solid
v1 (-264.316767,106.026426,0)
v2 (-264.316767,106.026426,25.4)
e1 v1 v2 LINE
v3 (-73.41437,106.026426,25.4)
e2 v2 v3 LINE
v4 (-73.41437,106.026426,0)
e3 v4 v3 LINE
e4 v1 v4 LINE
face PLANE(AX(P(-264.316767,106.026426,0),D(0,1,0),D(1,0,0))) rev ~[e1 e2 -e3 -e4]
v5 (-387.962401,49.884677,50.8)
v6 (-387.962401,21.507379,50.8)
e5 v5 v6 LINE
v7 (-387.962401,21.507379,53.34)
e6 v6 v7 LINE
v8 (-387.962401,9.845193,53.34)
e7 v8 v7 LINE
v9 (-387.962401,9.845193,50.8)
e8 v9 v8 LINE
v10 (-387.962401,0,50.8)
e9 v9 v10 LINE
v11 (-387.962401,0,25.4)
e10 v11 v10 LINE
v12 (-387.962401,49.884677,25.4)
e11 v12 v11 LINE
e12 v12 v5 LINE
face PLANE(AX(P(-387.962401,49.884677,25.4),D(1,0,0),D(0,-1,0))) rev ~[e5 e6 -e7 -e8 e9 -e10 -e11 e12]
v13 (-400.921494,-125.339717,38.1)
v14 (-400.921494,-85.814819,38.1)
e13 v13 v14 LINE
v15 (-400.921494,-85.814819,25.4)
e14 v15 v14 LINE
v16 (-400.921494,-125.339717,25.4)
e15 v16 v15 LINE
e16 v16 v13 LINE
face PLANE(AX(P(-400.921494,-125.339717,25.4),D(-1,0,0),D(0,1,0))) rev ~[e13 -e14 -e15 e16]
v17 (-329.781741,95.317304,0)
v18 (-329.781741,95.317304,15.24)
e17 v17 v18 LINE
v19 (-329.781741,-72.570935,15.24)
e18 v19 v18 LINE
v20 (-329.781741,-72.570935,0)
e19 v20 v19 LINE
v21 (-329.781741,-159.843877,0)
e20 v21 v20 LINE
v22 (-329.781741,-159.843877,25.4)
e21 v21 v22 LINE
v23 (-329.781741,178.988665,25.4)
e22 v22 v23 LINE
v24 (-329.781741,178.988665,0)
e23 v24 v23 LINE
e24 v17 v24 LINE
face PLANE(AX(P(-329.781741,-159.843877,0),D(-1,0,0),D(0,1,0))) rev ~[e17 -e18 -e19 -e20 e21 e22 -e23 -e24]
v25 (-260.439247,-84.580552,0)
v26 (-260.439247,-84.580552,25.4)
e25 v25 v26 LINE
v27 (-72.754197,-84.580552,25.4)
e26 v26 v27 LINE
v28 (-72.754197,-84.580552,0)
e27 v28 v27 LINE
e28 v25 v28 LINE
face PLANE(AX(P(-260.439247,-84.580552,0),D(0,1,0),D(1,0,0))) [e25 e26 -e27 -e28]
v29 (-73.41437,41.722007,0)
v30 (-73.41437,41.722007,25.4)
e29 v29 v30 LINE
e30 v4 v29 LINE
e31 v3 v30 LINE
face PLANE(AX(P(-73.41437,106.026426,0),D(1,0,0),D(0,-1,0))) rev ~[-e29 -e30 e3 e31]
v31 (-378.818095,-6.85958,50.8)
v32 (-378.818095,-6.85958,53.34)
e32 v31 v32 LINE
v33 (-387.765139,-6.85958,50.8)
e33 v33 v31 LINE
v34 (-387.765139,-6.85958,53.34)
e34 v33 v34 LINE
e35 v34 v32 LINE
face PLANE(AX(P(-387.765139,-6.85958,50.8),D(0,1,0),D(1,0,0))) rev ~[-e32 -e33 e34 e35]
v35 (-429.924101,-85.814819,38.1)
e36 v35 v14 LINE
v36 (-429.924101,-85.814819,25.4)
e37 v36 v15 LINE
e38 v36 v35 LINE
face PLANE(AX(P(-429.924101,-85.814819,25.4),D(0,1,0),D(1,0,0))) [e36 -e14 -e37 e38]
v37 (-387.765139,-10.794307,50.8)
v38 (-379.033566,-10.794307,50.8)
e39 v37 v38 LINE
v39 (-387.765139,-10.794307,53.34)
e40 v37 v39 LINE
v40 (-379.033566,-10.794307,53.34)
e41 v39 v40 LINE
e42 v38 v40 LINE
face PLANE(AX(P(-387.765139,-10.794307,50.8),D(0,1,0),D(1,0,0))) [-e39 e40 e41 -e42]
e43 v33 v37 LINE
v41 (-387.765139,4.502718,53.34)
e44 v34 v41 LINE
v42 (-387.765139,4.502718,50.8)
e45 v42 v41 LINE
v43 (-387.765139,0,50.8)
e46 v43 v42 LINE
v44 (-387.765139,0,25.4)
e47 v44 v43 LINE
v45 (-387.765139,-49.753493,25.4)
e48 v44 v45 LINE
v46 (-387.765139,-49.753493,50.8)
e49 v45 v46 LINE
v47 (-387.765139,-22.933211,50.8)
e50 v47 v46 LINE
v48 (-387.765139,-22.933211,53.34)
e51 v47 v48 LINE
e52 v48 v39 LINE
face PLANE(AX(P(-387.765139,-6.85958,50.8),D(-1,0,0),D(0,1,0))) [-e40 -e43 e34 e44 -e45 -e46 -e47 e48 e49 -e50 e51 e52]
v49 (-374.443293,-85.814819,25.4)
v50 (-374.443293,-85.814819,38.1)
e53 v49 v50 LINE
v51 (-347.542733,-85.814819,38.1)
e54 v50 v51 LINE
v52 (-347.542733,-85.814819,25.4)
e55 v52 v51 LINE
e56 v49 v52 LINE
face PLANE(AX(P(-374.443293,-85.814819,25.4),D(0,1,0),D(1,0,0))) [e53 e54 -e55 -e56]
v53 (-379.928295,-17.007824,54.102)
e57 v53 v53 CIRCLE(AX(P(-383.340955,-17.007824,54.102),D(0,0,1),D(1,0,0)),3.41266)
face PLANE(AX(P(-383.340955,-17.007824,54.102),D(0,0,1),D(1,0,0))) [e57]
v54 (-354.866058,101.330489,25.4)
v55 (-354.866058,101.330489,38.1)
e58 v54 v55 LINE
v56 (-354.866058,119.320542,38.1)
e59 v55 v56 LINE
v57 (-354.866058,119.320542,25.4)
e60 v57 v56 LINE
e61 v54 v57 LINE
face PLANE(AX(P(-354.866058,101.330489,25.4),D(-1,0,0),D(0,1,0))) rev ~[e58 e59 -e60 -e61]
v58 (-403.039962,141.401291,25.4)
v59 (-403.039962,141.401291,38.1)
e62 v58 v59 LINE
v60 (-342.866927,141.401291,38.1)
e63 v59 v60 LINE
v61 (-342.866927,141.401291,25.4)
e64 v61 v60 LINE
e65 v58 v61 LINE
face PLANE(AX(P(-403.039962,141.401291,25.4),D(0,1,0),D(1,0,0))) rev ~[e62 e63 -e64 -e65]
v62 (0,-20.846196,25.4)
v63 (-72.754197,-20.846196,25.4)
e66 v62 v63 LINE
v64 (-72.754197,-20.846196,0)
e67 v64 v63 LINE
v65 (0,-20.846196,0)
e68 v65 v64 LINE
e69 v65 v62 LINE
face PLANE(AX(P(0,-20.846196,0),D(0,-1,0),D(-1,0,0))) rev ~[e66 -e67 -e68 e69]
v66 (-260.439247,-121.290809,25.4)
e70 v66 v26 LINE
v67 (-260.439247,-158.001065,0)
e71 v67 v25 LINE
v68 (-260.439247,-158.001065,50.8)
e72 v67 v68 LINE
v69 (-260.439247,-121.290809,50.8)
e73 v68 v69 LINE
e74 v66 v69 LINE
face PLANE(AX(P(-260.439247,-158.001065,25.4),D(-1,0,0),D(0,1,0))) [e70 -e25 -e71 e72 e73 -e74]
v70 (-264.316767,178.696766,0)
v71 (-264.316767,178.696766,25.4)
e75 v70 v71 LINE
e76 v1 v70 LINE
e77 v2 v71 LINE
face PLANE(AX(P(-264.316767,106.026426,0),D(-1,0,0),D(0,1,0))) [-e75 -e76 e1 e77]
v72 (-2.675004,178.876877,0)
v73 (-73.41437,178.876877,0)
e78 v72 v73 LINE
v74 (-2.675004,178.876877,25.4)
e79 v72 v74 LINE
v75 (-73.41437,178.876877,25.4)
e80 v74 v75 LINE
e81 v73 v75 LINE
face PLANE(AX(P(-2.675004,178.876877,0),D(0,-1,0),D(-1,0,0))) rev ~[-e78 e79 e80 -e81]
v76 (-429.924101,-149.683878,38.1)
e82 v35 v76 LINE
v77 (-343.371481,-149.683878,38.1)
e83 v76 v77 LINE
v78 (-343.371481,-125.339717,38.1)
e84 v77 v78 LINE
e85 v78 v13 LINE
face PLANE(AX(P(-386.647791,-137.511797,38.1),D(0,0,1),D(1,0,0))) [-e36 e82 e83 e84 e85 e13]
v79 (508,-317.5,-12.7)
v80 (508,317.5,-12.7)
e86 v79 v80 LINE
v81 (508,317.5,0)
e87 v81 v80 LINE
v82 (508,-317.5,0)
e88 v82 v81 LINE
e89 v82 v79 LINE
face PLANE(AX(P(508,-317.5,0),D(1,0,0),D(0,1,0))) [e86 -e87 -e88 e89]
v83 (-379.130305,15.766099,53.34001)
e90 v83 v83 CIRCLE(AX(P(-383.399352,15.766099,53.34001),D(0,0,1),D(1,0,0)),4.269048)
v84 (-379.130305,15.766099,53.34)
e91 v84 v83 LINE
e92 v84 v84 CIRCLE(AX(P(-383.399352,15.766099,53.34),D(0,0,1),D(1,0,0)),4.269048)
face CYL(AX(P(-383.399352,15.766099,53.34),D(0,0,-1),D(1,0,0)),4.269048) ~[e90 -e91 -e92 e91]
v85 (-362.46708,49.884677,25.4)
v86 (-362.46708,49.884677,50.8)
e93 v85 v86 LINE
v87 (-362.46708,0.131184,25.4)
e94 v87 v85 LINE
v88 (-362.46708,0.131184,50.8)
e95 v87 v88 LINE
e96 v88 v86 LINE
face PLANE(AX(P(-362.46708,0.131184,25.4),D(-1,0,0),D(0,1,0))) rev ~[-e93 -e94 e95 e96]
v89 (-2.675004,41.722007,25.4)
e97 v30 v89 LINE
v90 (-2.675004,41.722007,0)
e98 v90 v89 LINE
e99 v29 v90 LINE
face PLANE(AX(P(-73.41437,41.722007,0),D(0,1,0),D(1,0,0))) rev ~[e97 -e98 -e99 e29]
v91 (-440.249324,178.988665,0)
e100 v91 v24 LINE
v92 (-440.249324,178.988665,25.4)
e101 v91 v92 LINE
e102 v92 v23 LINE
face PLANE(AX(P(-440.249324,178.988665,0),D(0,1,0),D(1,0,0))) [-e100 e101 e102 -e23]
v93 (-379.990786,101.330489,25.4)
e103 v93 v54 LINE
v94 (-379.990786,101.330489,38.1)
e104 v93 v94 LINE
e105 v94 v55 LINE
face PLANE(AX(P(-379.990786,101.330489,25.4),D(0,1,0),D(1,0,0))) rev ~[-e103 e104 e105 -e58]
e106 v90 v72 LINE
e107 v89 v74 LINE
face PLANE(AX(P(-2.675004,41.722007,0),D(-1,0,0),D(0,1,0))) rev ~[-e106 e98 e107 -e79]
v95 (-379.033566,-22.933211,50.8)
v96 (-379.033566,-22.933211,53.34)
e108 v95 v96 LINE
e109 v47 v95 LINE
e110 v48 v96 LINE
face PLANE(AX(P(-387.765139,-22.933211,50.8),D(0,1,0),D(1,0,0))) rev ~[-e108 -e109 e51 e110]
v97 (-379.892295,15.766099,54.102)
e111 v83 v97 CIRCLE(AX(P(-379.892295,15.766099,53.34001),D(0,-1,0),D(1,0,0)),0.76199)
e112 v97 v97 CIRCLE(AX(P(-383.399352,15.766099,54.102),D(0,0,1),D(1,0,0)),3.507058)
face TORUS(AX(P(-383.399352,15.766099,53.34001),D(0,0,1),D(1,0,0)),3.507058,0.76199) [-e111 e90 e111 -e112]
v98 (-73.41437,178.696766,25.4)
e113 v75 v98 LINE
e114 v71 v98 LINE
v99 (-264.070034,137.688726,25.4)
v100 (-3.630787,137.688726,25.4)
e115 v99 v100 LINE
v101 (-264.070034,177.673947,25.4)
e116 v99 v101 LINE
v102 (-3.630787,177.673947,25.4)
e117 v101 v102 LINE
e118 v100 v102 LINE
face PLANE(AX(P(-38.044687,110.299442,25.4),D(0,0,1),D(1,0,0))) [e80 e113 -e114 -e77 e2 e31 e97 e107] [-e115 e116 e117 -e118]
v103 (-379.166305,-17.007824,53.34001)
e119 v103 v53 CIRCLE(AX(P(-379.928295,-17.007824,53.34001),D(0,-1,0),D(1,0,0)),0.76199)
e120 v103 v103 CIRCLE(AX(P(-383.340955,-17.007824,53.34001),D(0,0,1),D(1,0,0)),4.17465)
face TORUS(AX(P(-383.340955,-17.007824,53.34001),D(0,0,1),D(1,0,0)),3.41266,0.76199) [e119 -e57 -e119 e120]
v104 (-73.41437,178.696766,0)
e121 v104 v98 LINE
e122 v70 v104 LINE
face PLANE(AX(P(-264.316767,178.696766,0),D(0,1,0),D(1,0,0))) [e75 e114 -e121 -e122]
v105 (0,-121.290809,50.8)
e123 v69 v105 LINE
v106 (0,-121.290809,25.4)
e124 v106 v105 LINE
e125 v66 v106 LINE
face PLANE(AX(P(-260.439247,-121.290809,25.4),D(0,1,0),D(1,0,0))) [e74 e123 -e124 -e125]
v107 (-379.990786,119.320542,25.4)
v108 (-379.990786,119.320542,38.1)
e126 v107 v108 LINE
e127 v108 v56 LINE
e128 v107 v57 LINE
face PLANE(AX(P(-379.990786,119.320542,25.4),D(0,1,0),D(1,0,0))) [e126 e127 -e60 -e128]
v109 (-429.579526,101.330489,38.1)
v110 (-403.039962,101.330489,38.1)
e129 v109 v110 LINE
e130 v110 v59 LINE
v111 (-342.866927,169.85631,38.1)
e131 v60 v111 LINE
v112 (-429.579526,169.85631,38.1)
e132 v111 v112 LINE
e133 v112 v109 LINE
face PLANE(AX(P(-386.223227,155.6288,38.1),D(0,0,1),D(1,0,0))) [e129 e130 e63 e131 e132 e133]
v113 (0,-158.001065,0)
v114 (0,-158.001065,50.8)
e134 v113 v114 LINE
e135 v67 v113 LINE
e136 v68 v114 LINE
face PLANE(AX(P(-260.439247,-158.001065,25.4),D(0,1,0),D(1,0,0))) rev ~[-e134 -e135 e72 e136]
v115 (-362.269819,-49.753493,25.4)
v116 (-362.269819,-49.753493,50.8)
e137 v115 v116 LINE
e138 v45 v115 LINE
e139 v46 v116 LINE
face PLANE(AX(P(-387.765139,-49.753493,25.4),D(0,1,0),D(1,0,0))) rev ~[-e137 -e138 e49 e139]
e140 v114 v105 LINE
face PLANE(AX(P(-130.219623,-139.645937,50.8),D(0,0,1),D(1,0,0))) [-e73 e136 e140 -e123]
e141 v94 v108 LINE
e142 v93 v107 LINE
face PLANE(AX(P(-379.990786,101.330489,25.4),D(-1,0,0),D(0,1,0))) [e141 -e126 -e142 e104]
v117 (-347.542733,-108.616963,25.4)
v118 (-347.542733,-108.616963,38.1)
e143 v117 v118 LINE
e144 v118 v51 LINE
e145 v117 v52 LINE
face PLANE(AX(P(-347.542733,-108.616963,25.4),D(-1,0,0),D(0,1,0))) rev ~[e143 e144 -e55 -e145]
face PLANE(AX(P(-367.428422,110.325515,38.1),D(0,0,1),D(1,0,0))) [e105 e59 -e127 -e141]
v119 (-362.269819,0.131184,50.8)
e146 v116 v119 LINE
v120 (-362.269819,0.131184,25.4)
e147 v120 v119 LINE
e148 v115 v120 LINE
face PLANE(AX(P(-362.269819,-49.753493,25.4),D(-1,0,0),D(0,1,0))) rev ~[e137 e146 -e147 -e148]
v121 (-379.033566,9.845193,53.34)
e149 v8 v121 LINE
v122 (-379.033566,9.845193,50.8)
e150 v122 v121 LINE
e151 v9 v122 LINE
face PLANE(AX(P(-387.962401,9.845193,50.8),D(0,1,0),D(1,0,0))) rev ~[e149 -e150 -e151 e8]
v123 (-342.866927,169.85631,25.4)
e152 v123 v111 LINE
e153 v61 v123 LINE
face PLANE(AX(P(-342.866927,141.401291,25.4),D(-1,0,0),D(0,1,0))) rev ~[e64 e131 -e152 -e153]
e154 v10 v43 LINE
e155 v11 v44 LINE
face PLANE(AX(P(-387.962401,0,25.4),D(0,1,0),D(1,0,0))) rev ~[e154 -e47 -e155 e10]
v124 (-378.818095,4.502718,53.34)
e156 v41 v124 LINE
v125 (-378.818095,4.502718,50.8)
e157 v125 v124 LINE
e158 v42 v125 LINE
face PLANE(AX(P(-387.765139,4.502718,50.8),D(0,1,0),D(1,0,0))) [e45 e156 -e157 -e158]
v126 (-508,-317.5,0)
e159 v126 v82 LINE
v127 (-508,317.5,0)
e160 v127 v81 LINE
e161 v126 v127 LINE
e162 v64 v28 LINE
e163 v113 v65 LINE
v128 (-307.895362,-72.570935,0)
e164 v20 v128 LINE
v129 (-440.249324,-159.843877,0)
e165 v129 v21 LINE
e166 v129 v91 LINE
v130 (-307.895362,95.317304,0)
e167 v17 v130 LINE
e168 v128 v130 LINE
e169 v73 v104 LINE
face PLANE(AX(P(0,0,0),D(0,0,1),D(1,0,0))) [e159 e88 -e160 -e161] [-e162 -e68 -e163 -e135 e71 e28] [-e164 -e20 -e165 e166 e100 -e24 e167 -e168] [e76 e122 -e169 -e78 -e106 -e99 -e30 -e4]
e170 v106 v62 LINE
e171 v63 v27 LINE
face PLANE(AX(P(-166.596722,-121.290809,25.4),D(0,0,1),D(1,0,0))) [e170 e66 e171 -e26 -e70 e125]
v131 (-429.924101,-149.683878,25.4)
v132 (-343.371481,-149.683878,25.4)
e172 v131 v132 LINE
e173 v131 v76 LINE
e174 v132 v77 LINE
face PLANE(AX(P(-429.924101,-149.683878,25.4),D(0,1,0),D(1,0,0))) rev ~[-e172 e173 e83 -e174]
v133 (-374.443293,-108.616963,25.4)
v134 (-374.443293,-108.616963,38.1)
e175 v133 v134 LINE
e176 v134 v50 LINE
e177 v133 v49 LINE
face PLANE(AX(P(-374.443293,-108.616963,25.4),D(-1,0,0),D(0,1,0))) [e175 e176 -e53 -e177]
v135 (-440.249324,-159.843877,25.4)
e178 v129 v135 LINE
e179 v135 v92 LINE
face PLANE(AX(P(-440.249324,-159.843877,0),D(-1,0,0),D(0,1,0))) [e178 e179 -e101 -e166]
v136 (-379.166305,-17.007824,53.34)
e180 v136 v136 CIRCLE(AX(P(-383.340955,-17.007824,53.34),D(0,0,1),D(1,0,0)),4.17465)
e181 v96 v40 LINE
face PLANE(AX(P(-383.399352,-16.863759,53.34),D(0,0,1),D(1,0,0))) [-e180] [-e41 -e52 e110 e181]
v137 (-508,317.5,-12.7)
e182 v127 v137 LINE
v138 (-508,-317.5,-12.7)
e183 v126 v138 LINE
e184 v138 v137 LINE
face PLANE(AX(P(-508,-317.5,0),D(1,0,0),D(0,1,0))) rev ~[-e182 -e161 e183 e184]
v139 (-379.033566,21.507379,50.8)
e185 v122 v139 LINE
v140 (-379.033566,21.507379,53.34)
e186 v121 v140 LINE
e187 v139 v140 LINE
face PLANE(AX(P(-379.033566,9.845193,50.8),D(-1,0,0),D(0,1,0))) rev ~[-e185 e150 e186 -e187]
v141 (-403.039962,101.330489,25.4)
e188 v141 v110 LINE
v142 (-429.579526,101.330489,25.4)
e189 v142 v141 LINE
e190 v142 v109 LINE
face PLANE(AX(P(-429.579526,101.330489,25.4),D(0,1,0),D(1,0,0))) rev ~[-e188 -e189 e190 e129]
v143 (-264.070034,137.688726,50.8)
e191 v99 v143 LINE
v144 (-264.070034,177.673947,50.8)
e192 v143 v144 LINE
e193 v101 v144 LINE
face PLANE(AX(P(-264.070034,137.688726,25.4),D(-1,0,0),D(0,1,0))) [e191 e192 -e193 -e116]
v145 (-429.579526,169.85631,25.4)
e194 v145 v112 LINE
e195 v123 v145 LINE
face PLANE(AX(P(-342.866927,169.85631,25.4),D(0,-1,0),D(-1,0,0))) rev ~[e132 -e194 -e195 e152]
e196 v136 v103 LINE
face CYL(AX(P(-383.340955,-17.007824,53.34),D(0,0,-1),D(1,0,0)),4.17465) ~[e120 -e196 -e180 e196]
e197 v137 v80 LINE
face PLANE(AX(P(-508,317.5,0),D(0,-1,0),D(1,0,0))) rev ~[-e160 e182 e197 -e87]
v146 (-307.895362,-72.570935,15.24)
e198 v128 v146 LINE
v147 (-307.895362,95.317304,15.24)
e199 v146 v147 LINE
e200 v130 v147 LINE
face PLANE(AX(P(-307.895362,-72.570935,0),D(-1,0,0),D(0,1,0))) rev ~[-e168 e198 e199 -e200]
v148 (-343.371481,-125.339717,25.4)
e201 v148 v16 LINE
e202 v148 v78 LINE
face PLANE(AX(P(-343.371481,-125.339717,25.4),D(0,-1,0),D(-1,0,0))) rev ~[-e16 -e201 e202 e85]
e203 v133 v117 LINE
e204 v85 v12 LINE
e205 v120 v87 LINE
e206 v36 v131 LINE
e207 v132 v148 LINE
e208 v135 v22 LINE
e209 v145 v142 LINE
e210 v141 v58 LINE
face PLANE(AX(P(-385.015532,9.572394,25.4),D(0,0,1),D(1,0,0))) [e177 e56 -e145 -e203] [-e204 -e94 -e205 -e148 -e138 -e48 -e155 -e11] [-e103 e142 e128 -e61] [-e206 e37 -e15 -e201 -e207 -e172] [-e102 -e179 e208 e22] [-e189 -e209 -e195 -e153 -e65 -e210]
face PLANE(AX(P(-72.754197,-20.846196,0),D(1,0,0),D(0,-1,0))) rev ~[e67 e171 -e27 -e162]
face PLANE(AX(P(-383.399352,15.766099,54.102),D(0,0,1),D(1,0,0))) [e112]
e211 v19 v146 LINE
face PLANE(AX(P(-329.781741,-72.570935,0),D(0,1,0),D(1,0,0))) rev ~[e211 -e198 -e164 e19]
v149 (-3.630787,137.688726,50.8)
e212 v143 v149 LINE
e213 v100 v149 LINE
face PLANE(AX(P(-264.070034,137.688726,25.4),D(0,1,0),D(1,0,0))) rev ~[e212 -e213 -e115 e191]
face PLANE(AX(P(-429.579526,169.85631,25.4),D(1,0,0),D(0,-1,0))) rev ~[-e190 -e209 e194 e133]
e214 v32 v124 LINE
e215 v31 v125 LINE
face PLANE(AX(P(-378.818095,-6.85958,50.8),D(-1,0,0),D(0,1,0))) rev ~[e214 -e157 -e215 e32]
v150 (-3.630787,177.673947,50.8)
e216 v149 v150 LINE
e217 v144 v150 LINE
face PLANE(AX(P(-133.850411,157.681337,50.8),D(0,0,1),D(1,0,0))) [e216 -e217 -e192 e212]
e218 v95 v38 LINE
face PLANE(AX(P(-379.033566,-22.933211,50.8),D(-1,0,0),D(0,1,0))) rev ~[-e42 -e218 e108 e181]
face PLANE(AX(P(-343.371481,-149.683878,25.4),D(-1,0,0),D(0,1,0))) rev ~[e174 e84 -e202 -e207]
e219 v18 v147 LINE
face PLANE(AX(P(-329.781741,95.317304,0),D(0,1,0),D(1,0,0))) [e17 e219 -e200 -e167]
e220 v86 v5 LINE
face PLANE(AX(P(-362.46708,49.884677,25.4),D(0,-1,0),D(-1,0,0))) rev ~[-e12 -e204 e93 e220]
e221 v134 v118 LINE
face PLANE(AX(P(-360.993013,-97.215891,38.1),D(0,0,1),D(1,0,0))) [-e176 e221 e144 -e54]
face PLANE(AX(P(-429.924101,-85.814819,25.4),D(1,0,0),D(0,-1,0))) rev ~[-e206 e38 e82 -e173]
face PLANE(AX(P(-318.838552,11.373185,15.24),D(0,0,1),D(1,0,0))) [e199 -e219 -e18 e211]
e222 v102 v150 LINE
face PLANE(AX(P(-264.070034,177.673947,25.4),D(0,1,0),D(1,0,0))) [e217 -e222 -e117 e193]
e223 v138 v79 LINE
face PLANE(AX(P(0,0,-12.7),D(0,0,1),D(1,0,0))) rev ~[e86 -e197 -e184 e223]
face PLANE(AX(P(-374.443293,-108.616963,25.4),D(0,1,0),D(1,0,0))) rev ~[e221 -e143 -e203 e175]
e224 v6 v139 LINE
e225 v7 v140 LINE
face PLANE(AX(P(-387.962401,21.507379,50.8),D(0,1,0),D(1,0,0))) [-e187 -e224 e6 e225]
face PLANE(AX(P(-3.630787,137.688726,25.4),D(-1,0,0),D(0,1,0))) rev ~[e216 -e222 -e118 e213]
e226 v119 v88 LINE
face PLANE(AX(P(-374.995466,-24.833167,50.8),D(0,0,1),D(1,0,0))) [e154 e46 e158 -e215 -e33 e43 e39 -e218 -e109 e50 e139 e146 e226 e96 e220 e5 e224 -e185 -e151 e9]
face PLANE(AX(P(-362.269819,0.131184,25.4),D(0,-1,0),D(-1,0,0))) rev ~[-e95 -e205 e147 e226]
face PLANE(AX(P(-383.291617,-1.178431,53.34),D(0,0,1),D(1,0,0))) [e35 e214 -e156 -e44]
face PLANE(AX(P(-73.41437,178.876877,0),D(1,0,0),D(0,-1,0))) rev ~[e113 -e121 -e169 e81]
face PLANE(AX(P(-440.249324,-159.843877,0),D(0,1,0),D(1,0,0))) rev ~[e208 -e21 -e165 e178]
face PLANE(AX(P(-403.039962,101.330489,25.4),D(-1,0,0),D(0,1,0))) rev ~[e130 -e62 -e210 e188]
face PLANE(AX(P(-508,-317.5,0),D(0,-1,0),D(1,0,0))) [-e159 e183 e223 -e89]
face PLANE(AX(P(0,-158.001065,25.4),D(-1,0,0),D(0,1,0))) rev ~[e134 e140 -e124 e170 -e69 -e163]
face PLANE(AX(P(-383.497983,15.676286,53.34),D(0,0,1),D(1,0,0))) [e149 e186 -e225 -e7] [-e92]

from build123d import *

# Parameters (mm, degrees)
F0_W      = 1016
F0_H      = 635
F1_DEPTH  = 12.7
F2_W      = 190.9023970366
F2_H      = 72.670340538
F2_W_2    = 110.4675829411
F2_H_2    = 338.8325423002
F2_W_3    = 187.6850500703
F2_H_3    = 73.4205134213
F3_DEPTH  = 25.4
F4_W      = 260.4392468929
F4_H      = 36.7102567106
F4_H_2    = 39.9852208793
F4_W_2    = 25.2980589867
F4_H_3    = 0.1311842352
F5_DEPTH  = 25.4
F6_W      = 29.0026068687
F6_H      = 39.524897933
F6_W_2    = 26.9005596638
F6_H_2    = 22.802144289
F6_W_3    = 26.5395641327
F6_H_3    = 40.0708019733
F6_W_4    = 25.1247286797
F6_H_4    = 17.9900527
F7_DEPTH  = 12.7
F8_W      = 8.947044611
F8_H      = 11.3622983918
F8_W_2    = 8.928835392
F8_H_2    = 11.6621851921
F8_W_3    = 8.7315738201
F8_H_3    = 12.1389040723
F9_DEPTH  = 2.54
F10_R     = 4.1746501932
F10_R_2   = 4.2690475455
F11_DEPTH = 0.762
F12_R     = 0.76199
F13_W     = 21.8863785267
F13_H     = 167.8882390261
F14_DEPTH = 15.24


# Not quite as in the source:
# - a fillet or chamfer is up to 0.001 mm smaller than in the source, because OpenCascade refuses the exact size


with BuildPart() as f1:
    # F0 (on Top) → F1 (new body)
    with BuildSketch(Plane.XY):
        Rectangle(F0_W, F0_H)
    extrude(amount=-F1_DEPTH)

    # F2 (on face) → F3 (join)
    with BuildSketch(Plane.XY):
        Polygon((-73.4143704176, 178.6967664957), (-73.4143704176, 106.0264259577), (-73.4143704176, 41.7220070958), (-2.6750040706, 41.7220070958), (-2.6750040706, 178.8768768311), (-73.4143704176, 178.8768768311), align=None)
        with Locations((-168.8655689359, 142.3615962267)):
            Rectangle(F2_W, F2_H)
        with Locations((-385.0155323744, 9.5723941922)):
            Rectangle(F2_W_2, F2_H_2)
        with Locations((-166.5967218578, -121.2908085436)):
            Rectangle(F2_W_3, F2_H_3)
        Polygon((-72.7541968226, -84.5805518329), (-72.7541968226, -158.0010652542), (0, -158.0010652542), (0, -20.846195519), (-72.7541968226, -20.846195519), align=None)
    extrude(amount=F3_DEPTH)

    # F4 (on face) → F5 (join)
    with BuildSketch(Plane.XY.offset(25.4)):
        with Locations((-130.2196234465, -139.6459368989)):
            Rectangle(F4_W, F4_H)
        with Locations((-133.8504105806, 157.6813366264)):
            Rectangle(F4_W, F4_H_2)
        Polygon((-362.4670803547, 0.1311842352), (-362.4670803547, 0), (-387.7651393414, 0), (-387.7651393414, -49.7534926981), (-362.2698187828, -49.7534926981), (-362.2698187828, 0.1311842352), align=None)
        with Locations((-375.116109848, 0.0655921176)):
            Rectangle(F4_W_2, F4_H_3)
        Polygon((-387.9624009132, 0), (-387.7651393414, 0), (-387.7651393414, 0.1311842352), (-362.4670803547, 0.1311842352), (-362.4670803547, 49.8846769333), (-387.9624009132, 49.8846769333), align=None)
    extrude(amount=F5_DEPTH)

    # F6 (on face) → F7 (join)
    with BuildSketch(Plane.XY.offset(25.4)):
        Polygon((-343.3714807034, -149.6838778257), (-343.3714807034, -125.3397166729), (-400.9214937687, -125.3397166729), (-429.9241006374, -125.3397166729), (-429.9241006374, -149.6838778257), align=None)
        with Locations((-415.4227972031, -105.5772677064)):
            Rectangle(F6_W, F6_H)
        with Locations((-360.9930127859, -97.2158908844)):
            Rectangle(F6_W_2, F6_H_2)
        Polygon((-342.8669273853, 141.4012908936), (-342.8669273853, 169.8563098907), (-429.579526186, 169.8563098907), (-429.579526186, 141.4012908936), (-403.0399620533, 141.4012908936), align=None)
        with Locations((-416.3097441196, 121.3658899069)):
            Rectangle(F6_W_3, F6_H_3)
        with Locations((-367.4284219742, 110.3255152702)):
            Rectangle(F6_W_4, F6_H_4)
    extrude(amount=F7_DEPTH)

    # F8 (on face) → F9 (join)
    with BuildSketch(Plane.XY.offset(50.8)):
        with Locations((-383.2916170359, -1.178430859)):
            Rectangle(F8_W, F8_H)
        with Locations((-383.4979832172, 15.6762860715)):
            Rectangle(F8_W_2, F8_H_2)
        with Locations((-383.3993524313, -16.8637591414)):
            Rectangle(F8_W_3, F8_H_3)
    extrude(amount=F9_DEPTH)

    # F10 (on face) → F11 (join)
    with BuildSketch(Plane.XY.offset(53.34)):
        with Locations((-383.3409547806, -17.0078240335)):
            Circle(F10_R)
        with Locations((-383.3993524313, 15.7660990953)):
            Circle(F10_R_2)
    extrude(amount=F11_DEPTH)

    # F12 (radius 0.762 in the source; OpenCascade refuses exactly that, so slightly less here)
    f12_edges = [f1.edges().sort_by_distance(p)[0] for p in [
        (-387.515605, -17.007824, 54.102),
        (-387.6684, 15.766099, 54.102),
    ]]
    fillet(f12_edges, radius=F12_R)

    # F13 (on face) → F14 (join)
    with BuildSketch(Plane.XY):
        with Locations((-318.8385516405, 11.3731846213)):
            Rectangle(F13_W, F13_H)
    extrude(amount=F14_DEPTH)


solid = f1.part
